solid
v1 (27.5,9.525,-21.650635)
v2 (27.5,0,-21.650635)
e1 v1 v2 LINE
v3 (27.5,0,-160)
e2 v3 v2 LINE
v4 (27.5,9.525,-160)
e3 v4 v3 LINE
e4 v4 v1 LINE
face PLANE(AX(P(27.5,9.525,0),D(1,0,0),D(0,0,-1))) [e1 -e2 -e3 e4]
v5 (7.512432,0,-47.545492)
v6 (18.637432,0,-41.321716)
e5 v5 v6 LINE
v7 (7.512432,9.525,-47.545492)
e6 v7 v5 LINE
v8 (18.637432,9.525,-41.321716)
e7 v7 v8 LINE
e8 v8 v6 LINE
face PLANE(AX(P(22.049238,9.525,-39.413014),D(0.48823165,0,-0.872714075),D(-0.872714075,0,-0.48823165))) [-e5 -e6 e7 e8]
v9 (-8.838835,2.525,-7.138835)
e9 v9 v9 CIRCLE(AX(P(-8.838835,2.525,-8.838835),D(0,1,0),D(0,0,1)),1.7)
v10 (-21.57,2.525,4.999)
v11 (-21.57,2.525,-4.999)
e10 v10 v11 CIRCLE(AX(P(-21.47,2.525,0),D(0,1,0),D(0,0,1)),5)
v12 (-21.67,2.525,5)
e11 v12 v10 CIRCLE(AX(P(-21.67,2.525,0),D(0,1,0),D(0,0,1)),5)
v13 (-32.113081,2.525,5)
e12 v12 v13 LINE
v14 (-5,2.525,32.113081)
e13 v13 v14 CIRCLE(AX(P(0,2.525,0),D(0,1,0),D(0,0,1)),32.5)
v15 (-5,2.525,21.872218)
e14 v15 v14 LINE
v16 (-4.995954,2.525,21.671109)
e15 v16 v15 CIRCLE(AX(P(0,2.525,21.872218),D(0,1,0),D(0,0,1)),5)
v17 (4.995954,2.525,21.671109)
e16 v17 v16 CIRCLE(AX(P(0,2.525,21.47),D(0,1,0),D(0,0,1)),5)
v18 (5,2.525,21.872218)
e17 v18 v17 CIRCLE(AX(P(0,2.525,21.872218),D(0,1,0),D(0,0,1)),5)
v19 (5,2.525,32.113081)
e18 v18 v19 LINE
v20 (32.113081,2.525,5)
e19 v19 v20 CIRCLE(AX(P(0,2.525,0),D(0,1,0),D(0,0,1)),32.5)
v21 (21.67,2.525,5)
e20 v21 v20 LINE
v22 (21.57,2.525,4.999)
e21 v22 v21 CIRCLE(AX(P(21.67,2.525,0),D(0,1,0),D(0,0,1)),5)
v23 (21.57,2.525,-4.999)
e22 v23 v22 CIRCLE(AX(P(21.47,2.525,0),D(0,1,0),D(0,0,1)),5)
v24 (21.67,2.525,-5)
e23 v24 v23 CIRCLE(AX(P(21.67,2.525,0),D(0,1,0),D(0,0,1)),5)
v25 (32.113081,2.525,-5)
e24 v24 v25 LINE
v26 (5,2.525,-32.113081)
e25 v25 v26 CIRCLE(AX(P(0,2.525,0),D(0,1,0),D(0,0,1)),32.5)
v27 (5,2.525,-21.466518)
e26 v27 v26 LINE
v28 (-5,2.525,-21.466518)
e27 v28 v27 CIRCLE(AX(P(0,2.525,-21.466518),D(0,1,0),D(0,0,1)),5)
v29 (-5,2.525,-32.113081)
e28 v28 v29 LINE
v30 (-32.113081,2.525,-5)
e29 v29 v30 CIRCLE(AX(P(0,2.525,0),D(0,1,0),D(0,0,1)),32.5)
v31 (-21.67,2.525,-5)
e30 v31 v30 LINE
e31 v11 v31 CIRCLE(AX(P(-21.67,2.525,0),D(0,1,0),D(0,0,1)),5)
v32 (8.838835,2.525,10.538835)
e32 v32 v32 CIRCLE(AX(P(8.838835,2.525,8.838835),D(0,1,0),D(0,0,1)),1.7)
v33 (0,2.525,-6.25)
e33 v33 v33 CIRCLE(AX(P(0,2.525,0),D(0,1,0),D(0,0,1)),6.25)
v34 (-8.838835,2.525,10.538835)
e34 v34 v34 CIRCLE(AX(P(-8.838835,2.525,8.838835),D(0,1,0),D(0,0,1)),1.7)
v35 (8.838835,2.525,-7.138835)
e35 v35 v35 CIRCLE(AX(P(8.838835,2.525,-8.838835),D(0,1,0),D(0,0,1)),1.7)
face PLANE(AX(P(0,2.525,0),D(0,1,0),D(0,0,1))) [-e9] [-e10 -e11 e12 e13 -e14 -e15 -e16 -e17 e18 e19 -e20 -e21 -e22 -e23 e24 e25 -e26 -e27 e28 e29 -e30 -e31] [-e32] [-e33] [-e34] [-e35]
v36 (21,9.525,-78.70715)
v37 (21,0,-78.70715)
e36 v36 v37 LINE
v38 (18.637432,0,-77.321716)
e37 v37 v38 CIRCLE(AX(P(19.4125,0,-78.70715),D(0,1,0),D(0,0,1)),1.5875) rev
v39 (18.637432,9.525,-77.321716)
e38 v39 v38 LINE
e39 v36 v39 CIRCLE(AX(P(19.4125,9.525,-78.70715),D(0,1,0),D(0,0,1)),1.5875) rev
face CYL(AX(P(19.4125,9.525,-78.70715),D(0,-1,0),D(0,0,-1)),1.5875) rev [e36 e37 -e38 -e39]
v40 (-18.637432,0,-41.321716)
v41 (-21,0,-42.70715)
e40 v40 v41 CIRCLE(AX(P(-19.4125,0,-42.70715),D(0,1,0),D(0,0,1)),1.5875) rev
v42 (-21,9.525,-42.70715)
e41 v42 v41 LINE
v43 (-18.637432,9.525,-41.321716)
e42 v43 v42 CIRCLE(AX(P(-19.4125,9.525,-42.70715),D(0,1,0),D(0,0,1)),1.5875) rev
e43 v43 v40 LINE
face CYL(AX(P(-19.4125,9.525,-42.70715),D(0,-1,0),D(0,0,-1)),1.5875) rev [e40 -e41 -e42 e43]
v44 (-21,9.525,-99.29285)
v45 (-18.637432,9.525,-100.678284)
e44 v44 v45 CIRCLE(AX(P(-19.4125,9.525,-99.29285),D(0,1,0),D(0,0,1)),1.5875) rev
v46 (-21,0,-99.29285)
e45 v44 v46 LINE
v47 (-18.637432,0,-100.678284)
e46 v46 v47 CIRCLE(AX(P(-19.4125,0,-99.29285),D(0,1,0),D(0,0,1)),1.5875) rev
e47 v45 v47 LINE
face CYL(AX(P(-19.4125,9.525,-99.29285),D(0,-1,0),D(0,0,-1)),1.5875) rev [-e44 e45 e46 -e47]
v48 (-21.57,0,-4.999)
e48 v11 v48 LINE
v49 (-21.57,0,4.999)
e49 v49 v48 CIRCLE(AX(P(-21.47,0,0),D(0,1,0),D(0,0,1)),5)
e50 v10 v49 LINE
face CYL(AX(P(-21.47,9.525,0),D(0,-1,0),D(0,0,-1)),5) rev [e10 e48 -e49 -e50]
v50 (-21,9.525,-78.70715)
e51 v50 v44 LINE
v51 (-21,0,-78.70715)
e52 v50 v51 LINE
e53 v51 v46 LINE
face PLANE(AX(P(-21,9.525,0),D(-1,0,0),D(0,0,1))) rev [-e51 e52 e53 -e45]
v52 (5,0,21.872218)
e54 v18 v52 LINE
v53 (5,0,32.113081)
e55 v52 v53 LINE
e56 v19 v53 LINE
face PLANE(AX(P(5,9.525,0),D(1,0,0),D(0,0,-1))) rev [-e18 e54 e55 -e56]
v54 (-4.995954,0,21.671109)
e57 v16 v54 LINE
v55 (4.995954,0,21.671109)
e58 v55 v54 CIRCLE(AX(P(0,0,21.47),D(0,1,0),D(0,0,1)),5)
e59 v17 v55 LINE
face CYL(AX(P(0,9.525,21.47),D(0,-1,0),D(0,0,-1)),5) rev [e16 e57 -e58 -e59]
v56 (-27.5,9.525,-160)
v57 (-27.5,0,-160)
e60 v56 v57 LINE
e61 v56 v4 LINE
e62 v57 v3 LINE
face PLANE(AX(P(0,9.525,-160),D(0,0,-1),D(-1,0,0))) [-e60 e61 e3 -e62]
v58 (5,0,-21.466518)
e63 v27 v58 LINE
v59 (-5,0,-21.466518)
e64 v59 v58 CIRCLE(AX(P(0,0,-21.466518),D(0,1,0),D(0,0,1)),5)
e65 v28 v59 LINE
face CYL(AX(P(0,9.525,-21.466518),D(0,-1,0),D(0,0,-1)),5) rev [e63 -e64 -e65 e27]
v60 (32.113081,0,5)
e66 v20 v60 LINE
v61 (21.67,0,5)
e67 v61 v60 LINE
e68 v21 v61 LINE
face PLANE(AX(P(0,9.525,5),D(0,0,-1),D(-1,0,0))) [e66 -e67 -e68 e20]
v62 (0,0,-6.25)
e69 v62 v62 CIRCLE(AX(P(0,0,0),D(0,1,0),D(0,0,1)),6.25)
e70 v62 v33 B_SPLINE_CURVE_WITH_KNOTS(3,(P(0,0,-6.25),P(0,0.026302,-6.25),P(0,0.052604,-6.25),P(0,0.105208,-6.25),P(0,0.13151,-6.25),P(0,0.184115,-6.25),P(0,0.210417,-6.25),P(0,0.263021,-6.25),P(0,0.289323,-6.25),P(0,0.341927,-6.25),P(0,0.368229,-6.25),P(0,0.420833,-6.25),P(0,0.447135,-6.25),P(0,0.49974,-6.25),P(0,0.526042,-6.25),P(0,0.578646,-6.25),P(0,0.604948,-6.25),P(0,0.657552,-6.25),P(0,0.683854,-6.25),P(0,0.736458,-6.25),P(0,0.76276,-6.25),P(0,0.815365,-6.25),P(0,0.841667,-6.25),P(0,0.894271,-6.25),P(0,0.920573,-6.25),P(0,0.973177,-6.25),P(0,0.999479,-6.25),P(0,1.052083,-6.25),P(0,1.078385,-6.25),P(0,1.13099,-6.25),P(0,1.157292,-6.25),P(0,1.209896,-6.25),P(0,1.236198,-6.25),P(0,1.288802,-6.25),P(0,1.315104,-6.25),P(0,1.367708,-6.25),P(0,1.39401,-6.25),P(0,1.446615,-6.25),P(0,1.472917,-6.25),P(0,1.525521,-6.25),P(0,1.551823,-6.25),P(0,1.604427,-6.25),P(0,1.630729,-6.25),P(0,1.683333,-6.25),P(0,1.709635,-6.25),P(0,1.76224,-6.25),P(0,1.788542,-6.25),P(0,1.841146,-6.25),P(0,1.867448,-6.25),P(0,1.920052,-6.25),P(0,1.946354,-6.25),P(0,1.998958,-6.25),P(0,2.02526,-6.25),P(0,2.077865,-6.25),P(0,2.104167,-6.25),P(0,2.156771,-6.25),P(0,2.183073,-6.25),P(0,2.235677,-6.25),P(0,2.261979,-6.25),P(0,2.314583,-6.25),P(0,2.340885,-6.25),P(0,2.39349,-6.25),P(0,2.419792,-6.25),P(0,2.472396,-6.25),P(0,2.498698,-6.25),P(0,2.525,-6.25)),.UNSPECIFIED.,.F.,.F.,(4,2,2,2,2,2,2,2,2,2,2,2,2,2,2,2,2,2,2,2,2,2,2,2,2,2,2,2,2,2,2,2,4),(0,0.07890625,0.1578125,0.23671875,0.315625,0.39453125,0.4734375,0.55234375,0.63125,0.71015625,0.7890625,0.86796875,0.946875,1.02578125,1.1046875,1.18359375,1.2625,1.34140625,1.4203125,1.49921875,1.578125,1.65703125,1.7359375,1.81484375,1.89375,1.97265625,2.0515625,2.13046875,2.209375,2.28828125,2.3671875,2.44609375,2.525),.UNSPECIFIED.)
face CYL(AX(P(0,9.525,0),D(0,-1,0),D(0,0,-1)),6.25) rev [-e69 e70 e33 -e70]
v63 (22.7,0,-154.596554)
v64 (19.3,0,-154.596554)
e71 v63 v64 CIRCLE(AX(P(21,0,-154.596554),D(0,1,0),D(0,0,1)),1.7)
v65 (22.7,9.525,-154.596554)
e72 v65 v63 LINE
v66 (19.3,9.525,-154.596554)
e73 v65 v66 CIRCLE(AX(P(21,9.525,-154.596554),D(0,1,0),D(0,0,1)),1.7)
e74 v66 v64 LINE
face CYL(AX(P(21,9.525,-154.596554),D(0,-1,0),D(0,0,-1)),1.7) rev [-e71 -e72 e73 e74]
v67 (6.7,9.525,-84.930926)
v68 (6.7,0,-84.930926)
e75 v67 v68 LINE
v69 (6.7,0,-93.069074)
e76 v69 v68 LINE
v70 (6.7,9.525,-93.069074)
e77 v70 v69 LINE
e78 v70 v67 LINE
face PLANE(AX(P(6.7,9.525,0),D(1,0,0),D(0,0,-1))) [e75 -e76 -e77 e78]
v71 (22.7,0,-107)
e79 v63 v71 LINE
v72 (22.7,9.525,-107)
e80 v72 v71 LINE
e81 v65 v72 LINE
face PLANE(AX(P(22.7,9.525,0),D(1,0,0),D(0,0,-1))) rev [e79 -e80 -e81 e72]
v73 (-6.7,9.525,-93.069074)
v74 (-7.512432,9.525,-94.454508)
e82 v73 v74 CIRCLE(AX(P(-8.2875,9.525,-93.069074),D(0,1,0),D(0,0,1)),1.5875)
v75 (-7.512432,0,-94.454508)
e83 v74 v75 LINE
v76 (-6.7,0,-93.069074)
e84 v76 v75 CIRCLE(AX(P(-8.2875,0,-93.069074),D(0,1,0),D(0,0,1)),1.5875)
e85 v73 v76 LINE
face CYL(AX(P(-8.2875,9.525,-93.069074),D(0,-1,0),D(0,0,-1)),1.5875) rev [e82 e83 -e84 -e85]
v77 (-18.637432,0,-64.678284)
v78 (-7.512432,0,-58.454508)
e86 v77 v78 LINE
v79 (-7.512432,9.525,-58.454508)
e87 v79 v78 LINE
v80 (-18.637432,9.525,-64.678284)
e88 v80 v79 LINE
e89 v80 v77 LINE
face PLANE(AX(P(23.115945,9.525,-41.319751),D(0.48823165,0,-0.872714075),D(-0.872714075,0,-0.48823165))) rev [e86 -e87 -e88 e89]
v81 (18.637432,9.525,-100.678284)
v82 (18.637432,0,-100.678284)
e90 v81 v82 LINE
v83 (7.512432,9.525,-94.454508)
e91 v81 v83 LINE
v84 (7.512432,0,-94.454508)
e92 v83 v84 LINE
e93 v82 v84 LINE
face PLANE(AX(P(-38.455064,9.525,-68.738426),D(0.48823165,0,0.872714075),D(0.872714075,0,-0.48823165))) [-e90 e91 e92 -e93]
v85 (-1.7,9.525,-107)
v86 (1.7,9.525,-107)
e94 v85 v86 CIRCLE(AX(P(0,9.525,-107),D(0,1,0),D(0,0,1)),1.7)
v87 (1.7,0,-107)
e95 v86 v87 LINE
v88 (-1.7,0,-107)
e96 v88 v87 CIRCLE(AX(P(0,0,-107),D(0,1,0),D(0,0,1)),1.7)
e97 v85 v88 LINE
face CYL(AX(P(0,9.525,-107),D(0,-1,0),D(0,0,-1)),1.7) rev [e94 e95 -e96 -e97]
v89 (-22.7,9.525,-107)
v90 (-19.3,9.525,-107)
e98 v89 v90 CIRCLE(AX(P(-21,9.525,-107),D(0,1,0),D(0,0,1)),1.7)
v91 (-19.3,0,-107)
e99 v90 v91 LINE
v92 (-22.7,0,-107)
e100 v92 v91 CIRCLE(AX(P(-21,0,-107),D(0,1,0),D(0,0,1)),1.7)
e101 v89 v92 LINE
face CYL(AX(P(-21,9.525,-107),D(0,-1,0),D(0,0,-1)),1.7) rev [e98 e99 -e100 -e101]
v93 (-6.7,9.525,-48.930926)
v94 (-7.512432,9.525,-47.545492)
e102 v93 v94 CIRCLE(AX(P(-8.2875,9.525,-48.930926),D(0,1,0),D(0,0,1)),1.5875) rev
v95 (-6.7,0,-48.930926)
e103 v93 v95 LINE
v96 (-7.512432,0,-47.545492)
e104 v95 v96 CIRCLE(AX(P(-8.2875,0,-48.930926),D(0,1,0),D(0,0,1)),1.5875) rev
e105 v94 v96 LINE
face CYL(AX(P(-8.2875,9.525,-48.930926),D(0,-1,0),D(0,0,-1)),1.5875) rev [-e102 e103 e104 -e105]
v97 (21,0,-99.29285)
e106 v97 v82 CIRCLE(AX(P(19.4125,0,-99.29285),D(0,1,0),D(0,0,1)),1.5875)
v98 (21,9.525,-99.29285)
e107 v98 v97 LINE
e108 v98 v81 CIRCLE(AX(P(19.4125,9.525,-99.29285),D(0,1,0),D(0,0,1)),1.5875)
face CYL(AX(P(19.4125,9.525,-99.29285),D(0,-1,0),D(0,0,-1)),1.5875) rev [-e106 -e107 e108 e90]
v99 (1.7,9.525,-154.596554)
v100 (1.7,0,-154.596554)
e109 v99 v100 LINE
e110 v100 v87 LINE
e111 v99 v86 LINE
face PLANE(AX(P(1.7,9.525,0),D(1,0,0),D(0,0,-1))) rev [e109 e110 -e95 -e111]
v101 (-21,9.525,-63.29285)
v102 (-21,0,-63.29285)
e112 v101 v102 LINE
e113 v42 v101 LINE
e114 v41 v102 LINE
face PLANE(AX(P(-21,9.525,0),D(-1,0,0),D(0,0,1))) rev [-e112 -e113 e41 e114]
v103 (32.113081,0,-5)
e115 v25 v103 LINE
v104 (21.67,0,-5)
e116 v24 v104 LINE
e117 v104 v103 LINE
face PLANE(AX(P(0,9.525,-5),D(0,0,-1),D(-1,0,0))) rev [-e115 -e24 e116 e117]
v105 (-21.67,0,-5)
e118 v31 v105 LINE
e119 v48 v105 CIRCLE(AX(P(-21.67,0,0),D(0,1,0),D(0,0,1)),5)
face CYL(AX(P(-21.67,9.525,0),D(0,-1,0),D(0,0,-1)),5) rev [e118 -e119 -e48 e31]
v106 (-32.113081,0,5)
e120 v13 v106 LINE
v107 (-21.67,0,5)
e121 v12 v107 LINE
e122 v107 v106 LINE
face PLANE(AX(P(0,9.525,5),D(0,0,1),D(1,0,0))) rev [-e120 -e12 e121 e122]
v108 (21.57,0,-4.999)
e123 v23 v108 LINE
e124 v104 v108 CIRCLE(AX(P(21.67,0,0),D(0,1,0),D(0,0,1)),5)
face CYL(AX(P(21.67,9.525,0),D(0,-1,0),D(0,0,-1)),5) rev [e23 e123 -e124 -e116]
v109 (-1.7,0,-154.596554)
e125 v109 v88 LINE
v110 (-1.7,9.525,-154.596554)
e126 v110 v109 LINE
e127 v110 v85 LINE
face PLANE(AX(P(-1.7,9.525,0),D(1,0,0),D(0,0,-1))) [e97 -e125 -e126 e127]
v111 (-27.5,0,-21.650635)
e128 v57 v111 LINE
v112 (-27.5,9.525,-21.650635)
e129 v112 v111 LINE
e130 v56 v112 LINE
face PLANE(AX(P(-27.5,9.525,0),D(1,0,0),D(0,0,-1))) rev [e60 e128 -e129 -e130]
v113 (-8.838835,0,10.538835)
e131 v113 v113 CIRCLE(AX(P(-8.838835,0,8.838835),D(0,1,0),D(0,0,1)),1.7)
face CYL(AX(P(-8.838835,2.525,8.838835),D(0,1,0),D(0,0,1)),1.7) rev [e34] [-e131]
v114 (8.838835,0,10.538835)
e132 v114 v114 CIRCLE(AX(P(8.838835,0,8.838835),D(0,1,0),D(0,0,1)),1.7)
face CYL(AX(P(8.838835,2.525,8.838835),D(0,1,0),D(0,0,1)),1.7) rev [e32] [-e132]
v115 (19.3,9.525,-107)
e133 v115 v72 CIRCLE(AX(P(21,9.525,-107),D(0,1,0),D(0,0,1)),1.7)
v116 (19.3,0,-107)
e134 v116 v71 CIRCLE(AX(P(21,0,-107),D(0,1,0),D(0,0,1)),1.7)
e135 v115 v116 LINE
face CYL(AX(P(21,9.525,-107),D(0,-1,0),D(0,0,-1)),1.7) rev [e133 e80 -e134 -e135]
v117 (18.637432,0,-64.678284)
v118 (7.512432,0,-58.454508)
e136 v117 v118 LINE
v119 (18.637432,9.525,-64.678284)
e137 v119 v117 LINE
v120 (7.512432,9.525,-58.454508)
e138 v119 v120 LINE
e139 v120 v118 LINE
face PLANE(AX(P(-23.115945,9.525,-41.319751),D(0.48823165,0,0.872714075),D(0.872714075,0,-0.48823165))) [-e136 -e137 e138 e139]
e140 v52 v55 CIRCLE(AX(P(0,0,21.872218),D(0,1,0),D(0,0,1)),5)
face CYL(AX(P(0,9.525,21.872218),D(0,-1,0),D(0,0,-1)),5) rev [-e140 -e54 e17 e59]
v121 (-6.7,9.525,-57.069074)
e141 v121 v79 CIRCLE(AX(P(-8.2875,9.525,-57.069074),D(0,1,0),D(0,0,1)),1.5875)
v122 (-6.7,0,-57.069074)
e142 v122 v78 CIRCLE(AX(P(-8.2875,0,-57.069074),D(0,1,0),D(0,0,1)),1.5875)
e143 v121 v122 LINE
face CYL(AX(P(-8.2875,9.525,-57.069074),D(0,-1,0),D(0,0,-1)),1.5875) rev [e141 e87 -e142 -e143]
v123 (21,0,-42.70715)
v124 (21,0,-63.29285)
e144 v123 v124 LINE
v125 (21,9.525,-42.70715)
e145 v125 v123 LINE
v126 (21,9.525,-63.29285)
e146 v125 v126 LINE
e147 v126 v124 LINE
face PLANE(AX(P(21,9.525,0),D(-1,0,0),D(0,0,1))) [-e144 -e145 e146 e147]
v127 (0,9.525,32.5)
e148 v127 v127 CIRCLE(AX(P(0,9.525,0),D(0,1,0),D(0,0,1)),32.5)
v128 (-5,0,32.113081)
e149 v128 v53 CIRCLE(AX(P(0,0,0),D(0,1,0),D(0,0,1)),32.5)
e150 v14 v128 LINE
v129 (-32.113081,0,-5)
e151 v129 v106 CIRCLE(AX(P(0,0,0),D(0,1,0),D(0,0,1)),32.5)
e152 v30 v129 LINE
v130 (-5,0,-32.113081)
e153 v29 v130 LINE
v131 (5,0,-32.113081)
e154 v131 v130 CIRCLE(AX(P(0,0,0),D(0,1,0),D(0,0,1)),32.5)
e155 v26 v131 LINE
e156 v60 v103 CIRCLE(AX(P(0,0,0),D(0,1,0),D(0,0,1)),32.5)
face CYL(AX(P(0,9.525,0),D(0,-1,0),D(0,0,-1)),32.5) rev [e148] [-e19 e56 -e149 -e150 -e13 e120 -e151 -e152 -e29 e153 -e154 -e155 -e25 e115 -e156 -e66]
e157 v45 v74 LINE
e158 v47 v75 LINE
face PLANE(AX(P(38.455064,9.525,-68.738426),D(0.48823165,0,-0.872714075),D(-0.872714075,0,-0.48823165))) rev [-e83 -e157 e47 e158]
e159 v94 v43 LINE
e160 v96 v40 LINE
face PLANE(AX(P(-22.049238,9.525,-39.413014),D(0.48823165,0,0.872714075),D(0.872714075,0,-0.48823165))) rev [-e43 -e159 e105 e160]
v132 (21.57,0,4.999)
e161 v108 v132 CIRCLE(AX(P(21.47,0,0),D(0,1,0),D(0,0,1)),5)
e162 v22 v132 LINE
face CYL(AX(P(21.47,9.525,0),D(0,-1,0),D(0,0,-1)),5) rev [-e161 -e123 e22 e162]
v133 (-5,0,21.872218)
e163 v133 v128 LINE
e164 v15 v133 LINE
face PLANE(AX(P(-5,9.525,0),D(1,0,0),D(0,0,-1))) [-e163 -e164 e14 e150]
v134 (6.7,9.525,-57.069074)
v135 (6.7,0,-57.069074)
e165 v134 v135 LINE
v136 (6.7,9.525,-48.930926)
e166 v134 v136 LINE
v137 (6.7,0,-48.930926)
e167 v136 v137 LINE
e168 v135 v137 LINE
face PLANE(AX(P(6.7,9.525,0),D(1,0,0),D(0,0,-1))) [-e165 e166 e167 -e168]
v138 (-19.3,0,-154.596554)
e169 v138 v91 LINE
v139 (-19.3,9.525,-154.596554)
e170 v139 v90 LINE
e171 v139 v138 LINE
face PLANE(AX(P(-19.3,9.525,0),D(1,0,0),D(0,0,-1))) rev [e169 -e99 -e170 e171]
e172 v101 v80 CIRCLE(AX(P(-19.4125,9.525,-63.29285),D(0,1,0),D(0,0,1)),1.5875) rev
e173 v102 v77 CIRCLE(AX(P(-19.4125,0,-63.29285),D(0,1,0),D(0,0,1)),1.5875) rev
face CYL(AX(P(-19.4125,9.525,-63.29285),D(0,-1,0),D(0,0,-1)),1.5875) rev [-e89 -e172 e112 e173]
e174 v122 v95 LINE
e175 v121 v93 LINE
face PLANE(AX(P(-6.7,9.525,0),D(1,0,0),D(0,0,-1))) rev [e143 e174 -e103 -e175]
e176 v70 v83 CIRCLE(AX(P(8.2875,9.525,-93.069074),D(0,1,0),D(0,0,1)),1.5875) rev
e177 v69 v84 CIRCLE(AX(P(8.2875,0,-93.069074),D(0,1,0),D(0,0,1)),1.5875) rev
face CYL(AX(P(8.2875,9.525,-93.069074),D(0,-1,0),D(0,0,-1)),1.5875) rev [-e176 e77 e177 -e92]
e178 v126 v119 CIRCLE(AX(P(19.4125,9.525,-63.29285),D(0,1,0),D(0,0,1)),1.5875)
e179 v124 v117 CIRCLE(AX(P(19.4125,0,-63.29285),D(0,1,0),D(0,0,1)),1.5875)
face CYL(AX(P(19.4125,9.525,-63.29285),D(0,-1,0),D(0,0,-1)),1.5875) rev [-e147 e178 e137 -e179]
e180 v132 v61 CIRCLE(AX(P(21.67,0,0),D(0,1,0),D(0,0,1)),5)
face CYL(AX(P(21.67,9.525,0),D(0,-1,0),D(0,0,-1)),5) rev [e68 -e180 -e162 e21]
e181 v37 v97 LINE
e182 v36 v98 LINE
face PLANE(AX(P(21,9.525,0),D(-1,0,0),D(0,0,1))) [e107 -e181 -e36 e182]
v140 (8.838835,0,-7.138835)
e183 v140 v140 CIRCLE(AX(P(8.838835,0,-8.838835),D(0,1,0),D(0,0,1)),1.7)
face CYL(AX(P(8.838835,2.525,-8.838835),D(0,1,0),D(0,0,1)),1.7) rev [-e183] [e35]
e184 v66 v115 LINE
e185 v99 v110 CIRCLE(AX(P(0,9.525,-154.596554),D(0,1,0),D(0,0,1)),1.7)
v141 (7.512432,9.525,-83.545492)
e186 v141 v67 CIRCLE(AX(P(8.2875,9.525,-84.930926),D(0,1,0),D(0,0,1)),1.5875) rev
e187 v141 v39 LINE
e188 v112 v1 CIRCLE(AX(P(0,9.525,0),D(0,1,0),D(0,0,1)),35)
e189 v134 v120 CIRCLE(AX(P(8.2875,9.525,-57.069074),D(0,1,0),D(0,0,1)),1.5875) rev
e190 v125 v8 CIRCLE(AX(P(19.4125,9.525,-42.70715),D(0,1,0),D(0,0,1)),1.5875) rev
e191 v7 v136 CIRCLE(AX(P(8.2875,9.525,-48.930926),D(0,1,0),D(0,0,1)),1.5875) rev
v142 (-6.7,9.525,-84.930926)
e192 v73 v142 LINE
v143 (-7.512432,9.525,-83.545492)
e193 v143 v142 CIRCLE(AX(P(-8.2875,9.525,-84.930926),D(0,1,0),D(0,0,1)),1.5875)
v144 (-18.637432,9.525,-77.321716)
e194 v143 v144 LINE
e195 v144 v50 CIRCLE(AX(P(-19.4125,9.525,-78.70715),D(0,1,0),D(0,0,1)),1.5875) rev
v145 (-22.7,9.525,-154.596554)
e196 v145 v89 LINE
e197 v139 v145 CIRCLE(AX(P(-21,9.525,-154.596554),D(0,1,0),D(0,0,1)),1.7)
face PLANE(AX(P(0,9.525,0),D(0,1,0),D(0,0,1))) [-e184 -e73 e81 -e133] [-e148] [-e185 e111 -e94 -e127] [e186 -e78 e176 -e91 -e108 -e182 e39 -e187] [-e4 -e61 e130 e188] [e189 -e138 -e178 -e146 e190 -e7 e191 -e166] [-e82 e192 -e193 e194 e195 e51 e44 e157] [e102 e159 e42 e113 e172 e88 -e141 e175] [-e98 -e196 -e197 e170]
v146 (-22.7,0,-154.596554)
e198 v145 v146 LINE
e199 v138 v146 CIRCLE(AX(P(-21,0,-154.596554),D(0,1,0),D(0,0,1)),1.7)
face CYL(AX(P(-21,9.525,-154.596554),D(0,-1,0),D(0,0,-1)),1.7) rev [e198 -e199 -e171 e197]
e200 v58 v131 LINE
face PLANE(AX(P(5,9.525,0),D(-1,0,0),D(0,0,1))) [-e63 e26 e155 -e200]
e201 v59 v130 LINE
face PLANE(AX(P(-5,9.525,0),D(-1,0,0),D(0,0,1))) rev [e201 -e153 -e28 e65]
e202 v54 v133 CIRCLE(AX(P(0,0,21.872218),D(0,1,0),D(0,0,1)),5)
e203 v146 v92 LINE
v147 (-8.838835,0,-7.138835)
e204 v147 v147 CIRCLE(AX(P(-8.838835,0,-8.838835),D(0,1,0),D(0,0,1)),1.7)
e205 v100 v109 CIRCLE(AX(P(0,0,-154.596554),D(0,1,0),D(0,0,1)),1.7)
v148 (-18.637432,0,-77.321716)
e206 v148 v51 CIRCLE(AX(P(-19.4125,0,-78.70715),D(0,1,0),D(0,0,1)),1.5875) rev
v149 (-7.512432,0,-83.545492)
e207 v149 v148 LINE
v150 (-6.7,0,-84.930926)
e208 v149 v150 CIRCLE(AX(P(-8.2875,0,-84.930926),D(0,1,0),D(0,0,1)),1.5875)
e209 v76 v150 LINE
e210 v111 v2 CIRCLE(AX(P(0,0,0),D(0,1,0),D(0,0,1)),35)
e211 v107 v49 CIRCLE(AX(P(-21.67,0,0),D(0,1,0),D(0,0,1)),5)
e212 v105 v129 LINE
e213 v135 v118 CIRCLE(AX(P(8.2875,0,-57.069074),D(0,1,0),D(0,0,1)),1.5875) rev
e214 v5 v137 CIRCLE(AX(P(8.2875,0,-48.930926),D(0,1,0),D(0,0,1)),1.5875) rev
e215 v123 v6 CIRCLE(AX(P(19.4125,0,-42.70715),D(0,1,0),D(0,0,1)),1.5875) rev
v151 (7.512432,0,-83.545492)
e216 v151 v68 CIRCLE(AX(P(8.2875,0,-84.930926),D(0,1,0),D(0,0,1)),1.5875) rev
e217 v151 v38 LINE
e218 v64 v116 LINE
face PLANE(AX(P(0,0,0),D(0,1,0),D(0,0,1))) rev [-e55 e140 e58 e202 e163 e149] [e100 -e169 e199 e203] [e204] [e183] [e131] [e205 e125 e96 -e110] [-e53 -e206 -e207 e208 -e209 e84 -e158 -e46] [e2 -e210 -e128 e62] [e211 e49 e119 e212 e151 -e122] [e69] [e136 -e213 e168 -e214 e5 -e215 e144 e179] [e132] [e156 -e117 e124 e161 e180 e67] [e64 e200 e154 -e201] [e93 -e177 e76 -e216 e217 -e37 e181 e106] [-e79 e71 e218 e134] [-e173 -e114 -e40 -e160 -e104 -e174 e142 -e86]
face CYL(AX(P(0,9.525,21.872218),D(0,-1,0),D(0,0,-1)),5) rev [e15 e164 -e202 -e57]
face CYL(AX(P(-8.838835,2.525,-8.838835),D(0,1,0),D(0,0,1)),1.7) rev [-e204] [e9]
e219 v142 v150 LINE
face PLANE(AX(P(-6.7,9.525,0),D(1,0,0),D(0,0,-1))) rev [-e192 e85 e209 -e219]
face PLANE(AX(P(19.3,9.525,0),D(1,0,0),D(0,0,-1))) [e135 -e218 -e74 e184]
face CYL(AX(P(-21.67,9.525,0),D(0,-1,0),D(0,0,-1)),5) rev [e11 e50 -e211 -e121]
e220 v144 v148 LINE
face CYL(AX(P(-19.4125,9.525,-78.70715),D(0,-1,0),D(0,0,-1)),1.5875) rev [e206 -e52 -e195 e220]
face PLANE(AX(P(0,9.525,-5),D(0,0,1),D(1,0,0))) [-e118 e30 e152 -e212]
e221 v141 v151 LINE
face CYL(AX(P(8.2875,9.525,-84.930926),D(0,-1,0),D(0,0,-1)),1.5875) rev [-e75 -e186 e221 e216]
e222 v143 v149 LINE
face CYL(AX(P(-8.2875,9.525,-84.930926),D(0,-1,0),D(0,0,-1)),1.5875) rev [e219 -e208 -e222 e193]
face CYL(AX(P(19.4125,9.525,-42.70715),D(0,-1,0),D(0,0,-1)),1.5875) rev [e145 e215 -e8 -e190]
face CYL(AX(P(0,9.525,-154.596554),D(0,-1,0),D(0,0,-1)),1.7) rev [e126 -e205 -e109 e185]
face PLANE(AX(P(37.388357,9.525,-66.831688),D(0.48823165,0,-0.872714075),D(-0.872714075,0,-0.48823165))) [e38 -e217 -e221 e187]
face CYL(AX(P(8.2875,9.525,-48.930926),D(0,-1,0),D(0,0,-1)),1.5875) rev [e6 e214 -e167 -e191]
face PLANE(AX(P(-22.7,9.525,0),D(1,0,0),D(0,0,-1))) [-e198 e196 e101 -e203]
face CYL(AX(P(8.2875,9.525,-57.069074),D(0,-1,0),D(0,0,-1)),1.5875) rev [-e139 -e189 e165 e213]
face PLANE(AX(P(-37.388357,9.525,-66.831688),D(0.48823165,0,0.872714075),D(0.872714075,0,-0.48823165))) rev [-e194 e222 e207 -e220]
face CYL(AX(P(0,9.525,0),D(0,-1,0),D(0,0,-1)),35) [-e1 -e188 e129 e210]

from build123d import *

# Parameters (mm, degrees)
BOSS_EXTRUDE1_OUTLINE_R = 6.25
BOSS_EXTRUDE1_DEPTH     = 9.525
CUT_EXTRUDE1_START      = -7
SKETCH3_R               = 32.5
CUT_EXTRUDE1_DEPTH      = 7
M3_CLEARANCE_HOLE1_D    = 3.4


# Read off the part's stored shape, not the designer's step: Boss-Extrude1
with BuildPart() as part:
    # Boss-Extrude1 outline → Boss-Extrude1 (new body)
    with BuildSketch(Plane(origin=(0, 0, 0), x_dir=(1, 0, 0), z_dir=(0, 1, 0))):
        with BuildLine():
            Line((-27.5, 160), (-27.5, 21.650635095))
            ThreePointArc((-27.5, 21.650635095), (0, -35), (27.5, 21.650635095))
            Line((27.5, 21.650635095), (27.5, 160))
            Line((27.5, 160), (-27.5, 160))
        make_face()
        with BuildLine():
            Line((-21.67, -5), (-32.113081447, -5))
            ThreePointArc((-32.113081447, -5), (-32.5, 0), (-32.113081447, 5))
            Line((-32.113081447, 5), (-21.67, 5))
            ThreePointArc((-21.67, 5), (-21.6199975, 4.999749969), (-21.57, 4.9989999))
            ThreePointArc((-21.57, 4.9989999), (-16.47, 0), (-21.57, -4.9989999))
            ThreePointArc((-21.57, -4.9989999), (-21.6199975, -4.999749969), (-21.67, -5))
        make_face(mode=Mode.SUBTRACT)
        with BuildLine():
            Line((-21, 42.707149814), (-21, 63.292850186))
            ThreePointArc((-21, 63.292850186), (-20.2155368, 64.662261792), (-18.637432255, 64.678283779))
            Line((-18.637432255, 64.678283779), (-7.512432255, 58.454507556))
            ThreePointArc((-7.512432255, 58.454507556), (-6.918088394, 57.872110763), (-6.7, 57.069073962))
            Line((-6.7, 57.069073962), (-6.7, 48.930926038))
            ThreePointArc((-6.7, 48.930926038), (-6.918088394, 48.127889237), (-7.512432255, 47.545492444))
            Line((-7.512432255, 47.545492444), (-18.637432255, 41.321716221))
            ThreePointArc((-18.637432255, 41.321716221), (-20.2155368, 41.337738208), (-21, 42.707149814))
        make_face(mode=Mode.SUBTRACT)
        with BuildLine():
            Line((5, -21.872218084), (5, -32.113081447))
            ThreePointArc((5, -32.113081447), (0, -32.5), (-5, -32.113081447))
            Line((-5, -32.113081447), (-5, -21.872218084))
            ThreePointArc((-5, -21.872218084), (-4.998988367, -21.771643214), (-4.995953878, -21.671109042))
            ThreePointArc((-4.995953878, -21.671109042), (0, -16.47), (4.995953878, -21.671109042))
            ThreePointArc((4.995953878, -21.671109042), (4.998988367, -21.771643214), (5, -21.872218084))
        make_face(mode=Mode.SUBTRACT)
        Circle(BOSS_EXTRUDE1_OUTLINE_R, mode=Mode.SUBTRACT)
        with BuildLine():
            Line((21.67, 5), (32.113081447, 5))
            ThreePointArc((32.113081447, 5), (32.5, 0), (32.113081447, -5))
            Line((32.113081447, -5), (21.67, -5))
            ThreePointArc((21.67, -5), (21.6199975, -4.999749969), (21.57, -4.9989999))
            ThreePointArc((21.57, -4.9989999), (16.47, 0), (21.57, 4.9989999))
            ThreePointArc((21.57, 4.9989999), (21.6199975, 4.999749969), (21.67, 5))
        make_face(mode=Mode.SUBTRACT)
        with BuildLine():
            Line((-5, 21.466517846), (-5, 32.113081447))
            ThreePointArc((-5, 32.113081447), (0, 32.5), (5, 32.113081447))
            Line((5, 32.113081447), (5, 21.466517846))
            ThreePointArc((5, 21.466517846), (0, 16.466517846), (-5, 21.466517846))
        make_face(mode=Mode.SUBTRACT)
        with BuildLine():
            ThreePointArc((7.512432255, 47.545492444), (6.918088394, 48.127889237), (6.7, 48.930926038))
            Line((6.7, 48.930926038), (6.7, 57.069073962))
            ThreePointArc((6.7, 57.069073962), (6.918088394, 57.872110763), (7.512432255, 58.454507556))
            Line((7.512432255, 58.454507556), (18.637432255, 64.678283779))
            ThreePointArc((18.637432255, 64.678283779), (20.2155368, 64.662261792), (21, 63.292850186))
            Line((21, 63.292850186), (21, 42.707149814))
            ThreePointArc((21, 42.707149814), (20.2155368, 41.337738208), (18.637432255, 41.321716221))
            Line((18.637432255, 41.321716221), (7.512432255, 47.545492444))
        make_face(mode=Mode.SUBTRACT)
        with BuildLine():
            Line((-21, 78.707149814), (-21, 99.292850186))
            ThreePointArc((-21, 99.292850186), (-20.2155368, 100.662261792), (-18.637432255, 100.678283779))
            Line((-18.637432255, 100.678283779), (-7.512432255, 94.454507556))
            ThreePointArc((-7.512432255, 94.454507556), (-6.918088394, 93.872110763), (-6.7, 93.069073962))
            Line((-6.7, 93.069073962), (-6.7, 84.930926038))
            ThreePointArc((-6.7, 84.930926038), (-6.918088394, 84.127889237), (-7.512432255, 83.545492444))
            Line((-7.512432255, 83.545492444), (-18.637432255, 77.321716221))
            ThreePointArc((-18.637432255, 77.321716221), (-20.2155368, 77.337738208), (-21, 78.707149814))
        make_face(mode=Mode.SUBTRACT)
        with BuildLine():
            Line((-19.3, 154.596553922), (-19.3, 107))
            ThreePointArc((-19.3, 107), (-21, 105.3), (-22.7, 107))
            Line((-22.7, 107), (-22.7, 154.596553922))
            ThreePointArc((-22.7, 154.596553922), (-21, 156.296553922), (-19.3, 154.596553922))
        make_face(mode=Mode.SUBTRACT)
        with BuildLine():
            ThreePointArc((18.637432255, 100.678283779), (20.2155368, 100.662261792), (21, 99.292850186))
            Line((21, 99.292850186), (21, 78.707149814))
            ThreePointArc((21, 78.707149814), (20.2155368, 77.337738208), (18.637432255, 77.321716221))
            Line((18.637432255, 77.321716221), (7.512432255, 83.545492444))
            ThreePointArc((7.512432255, 83.545492444), (6.918088394, 84.127889237), (6.7, 84.930926038))
            Line((6.7, 84.930926038), (6.7, 93.069073962))
            ThreePointArc((6.7, 93.069073962), (6.918088394, 93.872110763), (7.512432255, 94.454507556))
            Line((7.512432255, 94.454507556), (18.637432255, 100.678283779))
        make_face(mode=Mode.SUBTRACT)
        with BuildLine():
            Line((1.7, 154.596553922), (1.7, 107))
            ThreePointArc((1.7, 107), (0, 105.3), (-1.7, 107))
            Line((-1.7, 107), (-1.7, 154.596553922))
            ThreePointArc((-1.7, 154.596553922), (0, 156.296553922), (1.7, 154.596553922))
        make_face(mode=Mode.SUBTRACT)
        with BuildLine():
            Line((22.7, 154.596553922), (22.7, 107))
            ThreePointArc((22.7, 107), (21, 105.3), (19.3, 107))
            Line((19.3, 107), (19.3, 154.596553922))
            ThreePointArc((19.3, 154.596553922), (21, 156.296553922), (22.7, 154.596553922))
        make_face(mode=Mode.SUBTRACT)
    extrude(amount=BOSS_EXTRUDE1_DEPTH)

    # Sketch3 → Cut-Extrude1 (cut)
    with BuildSketch(Plane(origin=(0, 9.525, 0), x_dir=(1, 0, 0), z_dir=(0, 1, 0)).offset(CUT_EXTRUDE1_START)):
        with Locations(Location((0, 0, 0), (0, 0, 81.150116902))):
            Circle(SKETCH3_R)
    extrude(amount=CUT_EXTRUDE1_DEPTH, mode=Mode.SUBTRACT)

    # M3 Clearance Hole1 (through all)
    with Locations(Plane(origin=(0, 2.525, 0), x_dir=(1, 0, 0), z_dir=(0, 1, 0))):
        with Locations((8.838834765, 8.838834765), (-8.838834765, -8.838834765), (-8.838834765, 8.838834765), (8.838834765, -8.838834765)):
            Hole(M3_CLEARANCE_HOLE1_D / 2)


solid = part.part
